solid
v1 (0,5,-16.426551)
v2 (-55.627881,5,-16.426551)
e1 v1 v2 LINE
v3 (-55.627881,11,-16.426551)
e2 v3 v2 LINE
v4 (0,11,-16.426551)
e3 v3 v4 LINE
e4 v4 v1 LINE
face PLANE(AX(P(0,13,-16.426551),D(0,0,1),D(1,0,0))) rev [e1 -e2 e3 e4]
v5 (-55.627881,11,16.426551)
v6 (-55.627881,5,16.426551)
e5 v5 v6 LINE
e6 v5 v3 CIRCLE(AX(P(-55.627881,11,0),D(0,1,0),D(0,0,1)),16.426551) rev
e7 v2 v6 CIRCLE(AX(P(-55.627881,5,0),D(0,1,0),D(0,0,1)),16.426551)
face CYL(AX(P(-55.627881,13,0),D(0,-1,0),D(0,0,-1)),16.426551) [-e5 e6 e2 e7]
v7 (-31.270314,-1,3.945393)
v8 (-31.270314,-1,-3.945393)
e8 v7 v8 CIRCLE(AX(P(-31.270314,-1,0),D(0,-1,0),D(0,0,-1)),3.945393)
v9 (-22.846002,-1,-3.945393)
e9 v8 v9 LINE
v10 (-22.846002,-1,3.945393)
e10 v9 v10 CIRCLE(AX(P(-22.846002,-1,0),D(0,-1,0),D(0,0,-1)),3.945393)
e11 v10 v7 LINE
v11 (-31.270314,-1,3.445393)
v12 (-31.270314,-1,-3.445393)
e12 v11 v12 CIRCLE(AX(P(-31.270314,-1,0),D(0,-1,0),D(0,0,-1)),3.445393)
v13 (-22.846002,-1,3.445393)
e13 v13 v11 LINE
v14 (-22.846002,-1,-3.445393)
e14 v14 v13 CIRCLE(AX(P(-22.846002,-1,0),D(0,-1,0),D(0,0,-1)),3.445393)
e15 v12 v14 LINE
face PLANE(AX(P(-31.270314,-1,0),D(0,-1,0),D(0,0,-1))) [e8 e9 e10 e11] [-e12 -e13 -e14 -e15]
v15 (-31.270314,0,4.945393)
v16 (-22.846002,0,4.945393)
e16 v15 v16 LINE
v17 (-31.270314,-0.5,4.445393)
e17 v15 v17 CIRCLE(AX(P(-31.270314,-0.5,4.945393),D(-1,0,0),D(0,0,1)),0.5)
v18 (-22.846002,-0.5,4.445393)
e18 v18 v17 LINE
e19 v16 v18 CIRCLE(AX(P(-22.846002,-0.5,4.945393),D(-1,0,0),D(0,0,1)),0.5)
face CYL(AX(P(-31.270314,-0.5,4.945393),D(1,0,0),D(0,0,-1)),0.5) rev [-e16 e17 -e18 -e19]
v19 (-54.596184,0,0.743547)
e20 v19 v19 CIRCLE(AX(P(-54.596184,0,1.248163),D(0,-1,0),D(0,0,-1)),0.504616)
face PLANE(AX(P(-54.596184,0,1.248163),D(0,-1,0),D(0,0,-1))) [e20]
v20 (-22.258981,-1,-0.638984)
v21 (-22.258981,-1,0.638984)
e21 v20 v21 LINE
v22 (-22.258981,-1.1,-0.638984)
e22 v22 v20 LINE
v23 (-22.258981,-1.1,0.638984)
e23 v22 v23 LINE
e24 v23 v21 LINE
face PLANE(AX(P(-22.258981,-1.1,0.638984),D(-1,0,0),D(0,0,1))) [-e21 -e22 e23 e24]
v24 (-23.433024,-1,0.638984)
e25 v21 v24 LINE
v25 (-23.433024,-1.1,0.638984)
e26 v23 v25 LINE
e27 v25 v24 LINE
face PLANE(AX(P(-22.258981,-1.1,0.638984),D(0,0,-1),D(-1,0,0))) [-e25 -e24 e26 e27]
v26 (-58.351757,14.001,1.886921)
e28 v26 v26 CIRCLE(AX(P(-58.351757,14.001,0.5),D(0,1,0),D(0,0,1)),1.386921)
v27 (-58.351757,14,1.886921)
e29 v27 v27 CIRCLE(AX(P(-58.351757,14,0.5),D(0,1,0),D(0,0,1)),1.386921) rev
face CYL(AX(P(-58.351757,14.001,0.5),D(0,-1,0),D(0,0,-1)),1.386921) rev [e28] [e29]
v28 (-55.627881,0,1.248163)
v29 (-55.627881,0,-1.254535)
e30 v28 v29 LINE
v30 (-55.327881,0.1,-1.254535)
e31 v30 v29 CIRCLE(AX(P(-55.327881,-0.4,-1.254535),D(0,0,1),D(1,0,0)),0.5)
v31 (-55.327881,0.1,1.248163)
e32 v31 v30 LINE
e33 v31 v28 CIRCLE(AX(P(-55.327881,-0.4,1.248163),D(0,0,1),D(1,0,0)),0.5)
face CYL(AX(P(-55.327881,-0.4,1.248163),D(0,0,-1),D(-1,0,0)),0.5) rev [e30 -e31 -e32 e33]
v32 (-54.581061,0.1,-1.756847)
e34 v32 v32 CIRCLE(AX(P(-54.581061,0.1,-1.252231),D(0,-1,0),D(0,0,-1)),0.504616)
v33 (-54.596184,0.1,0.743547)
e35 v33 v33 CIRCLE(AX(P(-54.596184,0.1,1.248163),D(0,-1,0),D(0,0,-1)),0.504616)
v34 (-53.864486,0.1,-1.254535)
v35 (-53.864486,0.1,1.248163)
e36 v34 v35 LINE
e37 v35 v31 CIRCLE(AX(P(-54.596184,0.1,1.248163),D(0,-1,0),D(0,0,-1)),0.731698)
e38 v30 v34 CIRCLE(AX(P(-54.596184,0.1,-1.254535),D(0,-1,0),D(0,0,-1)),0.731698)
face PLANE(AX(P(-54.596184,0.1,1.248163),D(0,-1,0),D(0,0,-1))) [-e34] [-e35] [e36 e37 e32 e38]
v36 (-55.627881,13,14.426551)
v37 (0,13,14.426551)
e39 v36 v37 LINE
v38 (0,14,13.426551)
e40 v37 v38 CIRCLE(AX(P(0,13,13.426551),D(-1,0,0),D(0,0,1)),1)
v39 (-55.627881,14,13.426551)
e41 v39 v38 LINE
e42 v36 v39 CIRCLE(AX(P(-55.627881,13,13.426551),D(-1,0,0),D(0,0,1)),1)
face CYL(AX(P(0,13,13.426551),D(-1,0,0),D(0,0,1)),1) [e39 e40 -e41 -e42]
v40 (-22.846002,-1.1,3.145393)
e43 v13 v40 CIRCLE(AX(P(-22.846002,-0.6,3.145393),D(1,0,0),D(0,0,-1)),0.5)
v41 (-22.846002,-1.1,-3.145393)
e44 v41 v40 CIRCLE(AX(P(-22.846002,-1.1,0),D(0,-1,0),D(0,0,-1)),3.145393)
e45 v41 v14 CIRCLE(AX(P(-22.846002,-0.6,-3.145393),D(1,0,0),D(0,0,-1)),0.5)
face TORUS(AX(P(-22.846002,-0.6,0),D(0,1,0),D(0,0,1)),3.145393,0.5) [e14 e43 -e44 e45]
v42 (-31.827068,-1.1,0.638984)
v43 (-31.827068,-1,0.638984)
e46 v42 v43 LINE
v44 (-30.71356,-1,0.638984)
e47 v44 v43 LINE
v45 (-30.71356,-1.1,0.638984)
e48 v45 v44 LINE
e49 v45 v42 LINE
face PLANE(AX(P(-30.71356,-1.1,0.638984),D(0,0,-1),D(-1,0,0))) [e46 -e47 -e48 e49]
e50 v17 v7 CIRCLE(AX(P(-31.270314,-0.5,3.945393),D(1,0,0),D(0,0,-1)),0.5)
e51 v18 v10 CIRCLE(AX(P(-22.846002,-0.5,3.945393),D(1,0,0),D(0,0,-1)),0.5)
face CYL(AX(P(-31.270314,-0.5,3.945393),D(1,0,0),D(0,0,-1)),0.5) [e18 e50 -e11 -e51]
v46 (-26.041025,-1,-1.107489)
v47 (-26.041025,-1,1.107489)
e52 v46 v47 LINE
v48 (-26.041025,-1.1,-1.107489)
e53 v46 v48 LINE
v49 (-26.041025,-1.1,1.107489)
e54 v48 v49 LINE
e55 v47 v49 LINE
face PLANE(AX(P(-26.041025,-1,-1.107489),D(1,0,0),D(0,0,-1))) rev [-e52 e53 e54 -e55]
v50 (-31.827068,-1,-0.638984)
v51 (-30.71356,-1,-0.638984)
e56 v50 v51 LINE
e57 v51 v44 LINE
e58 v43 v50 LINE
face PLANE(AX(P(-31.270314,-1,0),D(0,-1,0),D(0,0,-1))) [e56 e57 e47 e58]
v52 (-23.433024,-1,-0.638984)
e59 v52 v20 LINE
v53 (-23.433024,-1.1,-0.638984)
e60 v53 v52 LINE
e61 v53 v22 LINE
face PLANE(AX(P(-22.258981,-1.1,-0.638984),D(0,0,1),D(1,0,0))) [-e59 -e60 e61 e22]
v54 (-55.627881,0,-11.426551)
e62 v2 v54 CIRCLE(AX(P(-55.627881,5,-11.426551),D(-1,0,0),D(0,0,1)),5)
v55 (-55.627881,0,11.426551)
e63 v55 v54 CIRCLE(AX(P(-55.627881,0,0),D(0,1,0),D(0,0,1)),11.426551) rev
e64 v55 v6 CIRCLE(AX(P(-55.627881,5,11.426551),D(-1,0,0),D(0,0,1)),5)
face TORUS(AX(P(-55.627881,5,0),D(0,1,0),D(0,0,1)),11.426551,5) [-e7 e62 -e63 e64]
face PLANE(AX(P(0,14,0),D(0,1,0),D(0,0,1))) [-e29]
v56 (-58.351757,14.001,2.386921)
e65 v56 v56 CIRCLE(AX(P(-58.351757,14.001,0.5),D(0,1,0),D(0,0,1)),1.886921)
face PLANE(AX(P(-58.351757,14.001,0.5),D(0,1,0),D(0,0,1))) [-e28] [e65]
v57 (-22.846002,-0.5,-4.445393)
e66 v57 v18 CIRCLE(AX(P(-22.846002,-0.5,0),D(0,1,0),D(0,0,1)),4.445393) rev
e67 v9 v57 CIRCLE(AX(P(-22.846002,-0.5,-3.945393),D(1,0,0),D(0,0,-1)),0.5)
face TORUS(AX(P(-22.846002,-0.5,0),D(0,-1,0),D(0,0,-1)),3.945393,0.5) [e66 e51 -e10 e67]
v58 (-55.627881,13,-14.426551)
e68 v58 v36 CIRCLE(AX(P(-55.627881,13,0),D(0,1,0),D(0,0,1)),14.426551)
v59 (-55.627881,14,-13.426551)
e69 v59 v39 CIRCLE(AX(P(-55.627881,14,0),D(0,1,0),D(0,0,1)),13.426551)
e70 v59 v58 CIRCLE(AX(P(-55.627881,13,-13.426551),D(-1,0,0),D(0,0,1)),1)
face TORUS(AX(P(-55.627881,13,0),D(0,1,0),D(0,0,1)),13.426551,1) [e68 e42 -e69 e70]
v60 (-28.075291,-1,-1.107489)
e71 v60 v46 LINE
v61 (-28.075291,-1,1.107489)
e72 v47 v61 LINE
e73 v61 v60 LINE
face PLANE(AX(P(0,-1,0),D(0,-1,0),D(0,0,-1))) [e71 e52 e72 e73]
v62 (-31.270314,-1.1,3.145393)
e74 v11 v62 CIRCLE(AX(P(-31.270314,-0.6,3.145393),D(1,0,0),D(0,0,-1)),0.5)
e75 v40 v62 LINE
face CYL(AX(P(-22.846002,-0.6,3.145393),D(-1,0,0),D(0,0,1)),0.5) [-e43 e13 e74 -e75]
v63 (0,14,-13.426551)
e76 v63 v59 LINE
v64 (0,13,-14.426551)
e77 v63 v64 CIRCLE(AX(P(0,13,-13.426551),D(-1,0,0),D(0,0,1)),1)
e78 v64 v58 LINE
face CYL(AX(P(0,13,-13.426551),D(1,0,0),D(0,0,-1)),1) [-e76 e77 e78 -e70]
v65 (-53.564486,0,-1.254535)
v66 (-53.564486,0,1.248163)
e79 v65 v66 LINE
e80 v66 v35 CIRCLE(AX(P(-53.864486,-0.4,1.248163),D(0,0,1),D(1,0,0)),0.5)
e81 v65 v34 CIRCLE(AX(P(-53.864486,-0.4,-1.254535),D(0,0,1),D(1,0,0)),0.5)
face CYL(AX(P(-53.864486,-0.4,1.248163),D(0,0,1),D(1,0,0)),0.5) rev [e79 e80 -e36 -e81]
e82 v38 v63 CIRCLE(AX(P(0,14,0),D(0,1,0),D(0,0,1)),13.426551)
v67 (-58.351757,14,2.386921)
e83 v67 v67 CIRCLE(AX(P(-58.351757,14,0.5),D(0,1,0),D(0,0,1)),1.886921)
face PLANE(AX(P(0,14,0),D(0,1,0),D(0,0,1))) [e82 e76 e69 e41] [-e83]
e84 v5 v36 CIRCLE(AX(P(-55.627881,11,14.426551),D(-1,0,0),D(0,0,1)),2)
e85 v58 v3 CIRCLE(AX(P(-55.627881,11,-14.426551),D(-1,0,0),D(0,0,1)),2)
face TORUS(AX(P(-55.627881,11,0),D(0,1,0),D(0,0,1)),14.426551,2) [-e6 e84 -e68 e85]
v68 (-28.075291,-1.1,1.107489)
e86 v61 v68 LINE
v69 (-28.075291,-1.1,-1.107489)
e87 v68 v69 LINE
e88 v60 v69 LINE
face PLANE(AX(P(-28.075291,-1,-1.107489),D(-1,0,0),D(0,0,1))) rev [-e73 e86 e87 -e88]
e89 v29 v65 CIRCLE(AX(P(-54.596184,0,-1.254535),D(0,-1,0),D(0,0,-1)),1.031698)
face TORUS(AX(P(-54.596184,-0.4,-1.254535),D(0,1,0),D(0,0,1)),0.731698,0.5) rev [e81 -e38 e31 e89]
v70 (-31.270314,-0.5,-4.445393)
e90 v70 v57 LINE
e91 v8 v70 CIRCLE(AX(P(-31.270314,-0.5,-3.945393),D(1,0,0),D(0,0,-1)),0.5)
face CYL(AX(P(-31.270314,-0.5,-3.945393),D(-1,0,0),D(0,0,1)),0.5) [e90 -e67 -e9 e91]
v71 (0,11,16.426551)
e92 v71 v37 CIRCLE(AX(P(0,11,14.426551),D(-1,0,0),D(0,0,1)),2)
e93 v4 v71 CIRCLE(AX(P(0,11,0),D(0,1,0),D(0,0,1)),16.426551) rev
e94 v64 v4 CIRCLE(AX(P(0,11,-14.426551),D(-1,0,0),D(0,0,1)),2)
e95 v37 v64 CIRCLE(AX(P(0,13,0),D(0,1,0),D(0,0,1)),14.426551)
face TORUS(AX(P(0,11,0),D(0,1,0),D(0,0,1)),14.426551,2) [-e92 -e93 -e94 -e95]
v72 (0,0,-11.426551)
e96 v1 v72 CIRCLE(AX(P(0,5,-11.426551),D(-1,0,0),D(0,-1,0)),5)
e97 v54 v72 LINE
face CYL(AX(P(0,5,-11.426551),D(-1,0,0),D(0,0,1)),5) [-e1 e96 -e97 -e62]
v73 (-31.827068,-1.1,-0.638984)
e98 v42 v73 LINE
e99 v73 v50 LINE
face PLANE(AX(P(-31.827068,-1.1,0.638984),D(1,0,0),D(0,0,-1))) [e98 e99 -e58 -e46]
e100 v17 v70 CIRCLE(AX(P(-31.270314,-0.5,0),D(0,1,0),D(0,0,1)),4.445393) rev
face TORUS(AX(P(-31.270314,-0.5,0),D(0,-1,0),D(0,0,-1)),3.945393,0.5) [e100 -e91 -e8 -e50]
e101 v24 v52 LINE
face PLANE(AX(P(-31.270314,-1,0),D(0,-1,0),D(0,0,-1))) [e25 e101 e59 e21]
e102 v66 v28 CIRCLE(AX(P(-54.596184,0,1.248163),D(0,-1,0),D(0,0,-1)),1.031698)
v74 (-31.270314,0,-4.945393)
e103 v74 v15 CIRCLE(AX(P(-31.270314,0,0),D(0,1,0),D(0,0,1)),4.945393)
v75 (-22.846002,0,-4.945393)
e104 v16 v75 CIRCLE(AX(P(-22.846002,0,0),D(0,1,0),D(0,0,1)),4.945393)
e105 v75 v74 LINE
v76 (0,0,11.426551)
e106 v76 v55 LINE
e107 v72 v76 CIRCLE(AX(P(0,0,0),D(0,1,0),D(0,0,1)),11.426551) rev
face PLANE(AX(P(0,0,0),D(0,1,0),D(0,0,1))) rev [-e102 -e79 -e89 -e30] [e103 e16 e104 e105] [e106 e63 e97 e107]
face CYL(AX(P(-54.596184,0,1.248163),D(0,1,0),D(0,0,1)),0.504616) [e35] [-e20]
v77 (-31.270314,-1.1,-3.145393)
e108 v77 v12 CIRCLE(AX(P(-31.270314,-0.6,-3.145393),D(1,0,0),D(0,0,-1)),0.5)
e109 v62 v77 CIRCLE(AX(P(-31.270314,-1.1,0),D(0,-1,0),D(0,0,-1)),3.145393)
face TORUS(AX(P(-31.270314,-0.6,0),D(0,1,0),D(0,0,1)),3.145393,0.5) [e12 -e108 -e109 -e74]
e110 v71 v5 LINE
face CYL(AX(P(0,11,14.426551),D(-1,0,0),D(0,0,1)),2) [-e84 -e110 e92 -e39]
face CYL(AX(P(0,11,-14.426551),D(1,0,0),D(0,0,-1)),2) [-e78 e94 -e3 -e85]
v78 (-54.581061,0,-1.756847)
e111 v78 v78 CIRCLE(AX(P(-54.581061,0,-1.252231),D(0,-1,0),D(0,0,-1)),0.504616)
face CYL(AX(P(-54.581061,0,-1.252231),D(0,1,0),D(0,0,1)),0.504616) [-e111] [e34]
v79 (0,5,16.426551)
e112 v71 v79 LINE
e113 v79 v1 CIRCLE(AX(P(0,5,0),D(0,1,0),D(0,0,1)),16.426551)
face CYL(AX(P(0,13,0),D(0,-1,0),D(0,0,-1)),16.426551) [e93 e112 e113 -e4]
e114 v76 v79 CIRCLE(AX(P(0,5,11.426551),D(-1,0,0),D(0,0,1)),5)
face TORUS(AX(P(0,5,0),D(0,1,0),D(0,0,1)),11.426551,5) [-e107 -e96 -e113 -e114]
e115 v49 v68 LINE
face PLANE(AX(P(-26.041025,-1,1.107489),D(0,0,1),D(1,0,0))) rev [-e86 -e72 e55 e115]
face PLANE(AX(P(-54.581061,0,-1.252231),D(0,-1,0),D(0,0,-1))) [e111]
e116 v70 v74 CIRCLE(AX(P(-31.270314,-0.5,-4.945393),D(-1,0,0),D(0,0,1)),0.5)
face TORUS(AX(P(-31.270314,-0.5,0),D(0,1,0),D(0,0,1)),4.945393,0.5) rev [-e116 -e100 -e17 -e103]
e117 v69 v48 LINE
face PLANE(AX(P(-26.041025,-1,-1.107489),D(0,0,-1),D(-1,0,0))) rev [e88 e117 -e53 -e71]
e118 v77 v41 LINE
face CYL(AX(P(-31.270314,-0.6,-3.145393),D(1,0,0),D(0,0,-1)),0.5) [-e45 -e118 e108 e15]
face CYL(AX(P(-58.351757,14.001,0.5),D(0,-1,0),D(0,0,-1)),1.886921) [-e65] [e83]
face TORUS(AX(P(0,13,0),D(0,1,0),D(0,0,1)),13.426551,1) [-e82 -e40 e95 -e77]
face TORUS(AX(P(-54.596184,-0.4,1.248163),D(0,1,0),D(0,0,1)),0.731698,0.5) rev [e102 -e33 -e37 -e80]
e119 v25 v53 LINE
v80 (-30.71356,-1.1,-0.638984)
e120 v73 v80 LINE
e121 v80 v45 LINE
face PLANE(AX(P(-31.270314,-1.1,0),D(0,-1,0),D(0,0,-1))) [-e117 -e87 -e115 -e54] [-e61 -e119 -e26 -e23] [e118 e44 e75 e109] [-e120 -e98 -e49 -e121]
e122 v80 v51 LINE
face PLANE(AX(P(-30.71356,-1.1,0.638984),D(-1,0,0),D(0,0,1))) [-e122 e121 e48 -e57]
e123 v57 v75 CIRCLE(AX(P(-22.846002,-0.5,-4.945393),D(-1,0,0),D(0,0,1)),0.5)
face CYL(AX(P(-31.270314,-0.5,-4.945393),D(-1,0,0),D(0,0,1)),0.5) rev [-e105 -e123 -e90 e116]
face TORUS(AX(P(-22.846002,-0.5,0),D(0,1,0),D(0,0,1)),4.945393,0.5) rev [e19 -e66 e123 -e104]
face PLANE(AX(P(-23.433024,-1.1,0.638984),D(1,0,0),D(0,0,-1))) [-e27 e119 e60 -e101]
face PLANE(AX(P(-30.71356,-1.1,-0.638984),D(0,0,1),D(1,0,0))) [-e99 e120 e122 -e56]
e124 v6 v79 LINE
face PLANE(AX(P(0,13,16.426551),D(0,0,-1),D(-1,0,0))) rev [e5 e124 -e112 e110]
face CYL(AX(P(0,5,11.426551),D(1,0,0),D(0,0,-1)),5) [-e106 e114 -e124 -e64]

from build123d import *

# Parameters (mm, degrees)
BOSS_EXTRUDE1_DEPTH = 13
FILLET1_R           = 2
BOSS_EXTRUDE2_DEPTH = 1
FILLET2_R           = 1
FILLET3_R           = 5
BOSS_EXTRUDE3_DEPTH = 1
FILLET4_R           = 0.5
SKETCH4_W           = 1.174042857
SKETCH4_H           = 1.277967626
SKETCH4_W_2         = 1.113508224
BOSS_EXTRUDE4_DEPTH = 0.1
FILLET5_R           = 0.5
FILLET6_R           = 0.5
SKETCH5_W           = 2.340411645
SKETCH5_H           = 2.629602796
BOSS_EXTRUDE5_DEPTH = 0.2
SKETCH6_W           = 2.034265593
SKETCH6_H           = 2.21497745
CUT_EXTRUDE1_DEPTH  = 0.1
CUT_EXTRUDE2_DEPTH  = 0.1
FILLET7_R           = 0.5
SKETCH9_R           = 0.50461609
BOSS_EXTRUDE6_DEPTH = 0.1
SKETCH14_R          = 1.886920972
SKETCH14_R_2        = 1.386920972
BOSS_EXTRUDE7_DEPTH = 0.001


# Some blends are built 0.0001 mm under size
with BuildPart() as part:
    # Sketch1 → Boss-Extrude1 (new body)
    with BuildSketch(Plane(origin=(0, 0, 0), x_dir=(1, 0, 0), z_dir=(0, 1, 0))):
        with BuildLine():
            Line((0, -16.426551001), (-55.627881437, -16.426551001))
            ThreePointArc((-55.627881437, -16.426551001), (-72.054432439, 0), (-55.627881437, 16.426551001))
            Line((-55.627881437, 16.426551001), (0, 16.426551001))
            ThreePointArc((0, 16.426551001), (16.426551001, 0), (0, -16.426551001))
        make_face()
    extrude(amount=BOSS_EXTRUDE1_DEPTH)

    # Fillet1
    fillet1_edges = [part.edges().sort_by_distance(p)[0] for p in [
        (-72.054432439, 13, 0),
        (-27.813940719, 13, 16.426551001),
        (16.426551001, 13, 0),
        (-27.813940719, 13, -16.426551001),
    ]]
    fillet(fillet1_edges, radius=FILLET1_R)

    # Sketch2 → Boss-Extrude2 (add)
    with BuildSketch(Plane(origin=(0, 13, 0), x_dir=(1, 0, 0), z_dir=(0, 1, 0))):
        with BuildLine():
            Line((0, 14.426551001), (-55.627881437, 14.426551001))
            ThreePointArc((-55.627881437, 14.426551001), (-70.054432439, 0), (-55.627881437, -14.426551001))
            Line((-55.627881437, -14.426551001), (0, -14.426551001))
            ThreePointArc((0, -14.426551001), (14.426551001, 0), (0, 14.426551001))
        make_face()
    extrude(amount=BOSS_EXTRUDE2_DEPTH)

    # Fillet2
    fillet2_edges = [part.edges().sort_by_distance(p)[0] for p in [
        (-70.054432439, 14, 0),
        (-27.813940719, 14, -14.426551001),
        (14.426551001, 14, 0),
        (-27.813940719, 14, 14.426551001),
    ]]
    fillet(fillet2_edges, radius=FILLET2_R - 0.0001)  # a hair under: the kernel refuses the full size

    # Fillet3
    fillet3_edges = [part.edges().sort_by_distance(p)[0] for p in [
        (-27.813940719, 0, 16.426551001),
        (-72.054432439, 0, 0),
        (-27.813940719, 0, -16.426551001),
        (16.426551001, 0, 0),
    ]]
    fillet(fillet3_edges, radius=FILLET3_R)

    # Sketch3 → Boss-Extrude3 (add)
    with BuildSketch(Plane.XZ):
        with BuildLine():
            Line((-31.270313728, 4.445393379), (-22.846002165, 4.445393379))
            ThreePointArc((-22.846002165, 4.445393379), (-18.400608786, 0), (-22.846002165, -4.445393379))
            Line((-22.846002165, -4.445393379), (-31.270313728, -4.445393379))
            ThreePointArc((-31.270313728, -4.445393379), (-35.715707107, 0), (-31.270313728, 4.445393379))
        make_face()
    extrude(amount=BOSS_EXTRUDE3_DEPTH)

    # Fillet4
    fillet4_edges = [part.edges().sort_by_distance(p)[0] for p in [
        (-35.715707107, 0, 0),
        (-27.058157947, 0, -4.445393379),
        (-18.400608786, 0, 0),
        (-27.058157947, 0, 4.445393379),
    ]]
    fillet(fillet4_edges, radius=FILLET4_R)

    # Sketch4 → Boss-Extrude4 (add)
    with BuildSketch(Plane.XZ.offset(1)):
        with BuildLine():
            Line((-31.270313728, -3.445393379), (-22.846002165, -3.445393379))
            ThreePointArc((-22.846002165, -3.445393379), (-19.400608786, 0), (-22.846002165, 3.445393379))
            Line((-22.846002165, 3.445393379), (-31.270313728, 3.445393379))
            ThreePointArc((-31.270313728, 3.445393379), (-34.715707107, 0), (-31.270313728, -3.445393379))
        make_face()
        with Locations((-22.846002166, 0)):
            Rectangle(SKETCH4_W, SKETCH4_H, mode=Mode.SUBTRACT)
        with Locations((-31.270313728, 0)):
            Rectangle(SKETCH4_W_2, SKETCH4_H, mode=Mode.SUBTRACT)
    extrude(amount=BOSS_EXTRUDE4_DEPTH)

    # Fillet5
    # the kernel refuses this fillet: 0.5 mm, written as the material it takes off along each edge
    with BuildSketch(Plane(origin=(-22.846002165, -1.1, 0), x_dir=(0, 0, -1), z_dir=(-1, 0, 0))) as fillet5_piece_1:
        with BuildLine():
            CenterArc((3.145393379, -0.5), FILLET5_R, 53.130102354, 36.869897646)
            Line((3.145393379, 0), (3.145393379, 0.01))
            Line((3.145393379, 0.01), (3.445393379, 0.01))
            Line((3.445393379, 0.01), (3.455393379, 0))
            ThreePointArc((3.455393379, 0), (3.455393379, -0.05), (3.451393379, -0.092))
            Line((3.451393379, -0.092), (3.445393379, -0.1))
        make_face()
    revolve(axis=Axis((-22.846002165, -1.1, 0), (0, -1, 0)), revolution_arc=180, mode=Mode.SUBTRACT)
    with BuildSketch(Plane(origin=(-31.270313728, -1.1, -3.445393379), x_dir=(0, 1, 0), z_dir=(1, 0, 0)), Plane(origin=(-22.846002165, -1.1, 3.445393379), x_dir=(0, 1, 0), z_dir=(-1, 0, 0))) as fillet5_piece_2:
        with BuildLine():
            CenterArc((0.5, 0.3), FILLET5_R, 180, 36.869897646)
            Line((0, 0.3), (-0.01, 0.3))
            Line((-0.01, 0.3), (-0.01, 0))
            Line((-0.01, 0), (0, -0.01))
            ThreePointArc((0, -0.01), (0.05, -0.01), (0.092, -0.006))
            Line((0.092, -0.006), (0.1, 0))
        make_face()
    extrude(amount=8.424311563, mode=Mode.SUBTRACT)
    with BuildSketch(Plane(origin=(-31.270313728, -1.1, 0), x_dir=(0, 0, 1), z_dir=(1, 0, 0))) as fillet5_piece_3:
        with BuildLine():
            CenterArc((3.145393379, -0.5), FILLET5_R, 53.130102354, 36.869897646)
            Line((3.145393379, 0), (3.145393379, 0.01))
            Line((3.145393379, 0.01), (3.445393379, 0.01))
            Line((3.445393379, 0.01), (3.455393379, 0))
            ThreePointArc((3.455393379, 0), (3.455393379, -0.05), (3.451393379, -0.092))
            Line((3.451393379, -0.092), (3.445393379, -0.1))
        make_face()
    revolve(axis=Axis((-31.270313728, -1.1, 0), (0, -1, 0)), revolution_arc=180, mode=Mode.SUBTRACT)

    # Fillet6
    fillet6_edges = [part.edges().sort_by_distance(p)[0] for p in [
        (-18.400608786, -1, 0),
        (-27.058157947, -1, -4.445393379),
        (-35.715707107, -1, 0),
        (-27.058157947, -1, 4.445393379),
    ]]
    fillet(fillet6_edges, radius=FILLET6_R - 0.0001)  # a hair under: the kernel refuses the full size

    # Sketch5 → Boss-Extrude5 (add)
    with BuildSketch(Plane.XZ.offset(1.1)):
        with Locations((-27.058157947, 0)):
            Rectangle(SKETCH5_W, SKETCH5_H)
    extrude(amount=-BOSS_EXTRUDE5_DEPTH)

    # Sketch6 → Cut-Extrude1 (cut)
    with BuildSketch(Plane.XZ.offset(1.1)):
        with Locations((-27.058157947, 0)):
            Rectangle(SKETCH6_W, SKETCH6_H)
    extrude(amount=-CUT_EXTRUDE1_DEPTH, mode=Mode.SUBTRACT)

    # Sketch7 → Cut-Extrude2 (cut)
    with BuildSketch(Plane.XZ):
        with BuildLine():
            Line((-53.564486161, 1.248163032), (-53.564486161, -1.254534769))
            ThreePointArc((-53.564486161, -1.254534769), (-54.596183799, -2.286232407), (-55.627881437, -1.254534769))
            Line((-55.627881437, -1.254534769), (-55.627881437, 1.248163032))
            ThreePointArc((-55.627881437, 1.248163032), (-54.596183799, 2.27986067), (-53.564486161, 1.248163032))
        make_face()
    extrude(amount=-CUT_EXTRUDE2_DEPTH, mode=Mode.SUBTRACT)

    # Fillet7
    # the kernel refuses this fillet: 0.5 mm, written as the material it adds along each edge
    with BuildSketch(Plane(origin=(-55.627881437, 0.1, -1.254534769), x_dir=(0, -1, 0), z_dir=(0, 0, 1)), Plane(origin=(-53.564486161, 0.1, 1.248163032), x_dir=(0, -1, 0), z_dir=(0, 0, -1))) as fillet7_piece_1:
        with BuildLine():
            CenterArc((0.5, 0.3), FILLET7_R, 180, 36.869897646)
            Line((0, 0.3), (-0.01, 0.3))
            Line((-0.01, 0.3), (-0.01, 0))
            Line((-0.01, 0), (0, -0.01))
            ThreePointArc((0, -0.01), (0.05, -0.01), (0.092, -0.006))
            Line((0.092, -0.006), (0.1, 0))
        make_face()
    extrude(amount=2.502697801)
    with BuildSketch(Plane(origin=(-54.596183799, 0.1, -1.254534769), x_dir=(1, 0, 0), z_dir=(0, 0, 1))) as fillet7_piece_2:
        with BuildLine():
            CenterArc((0.731697638, -0.5), FILLET7_R, 53.130102354, 36.869897646)
            Line((0.731697638, 0), (0.731697638, 0.01))
            Line((0.731697638, 0.01), (1.031697638, 0.01))
            Line((1.031697638, 0.01), (1.041697638, 0))
            ThreePointArc((1.041697638, 0), (1.041697638, -0.05), (1.037697638, -0.092))
            Line((1.037697638, -0.092), (1.031697638, -0.1))
        make_face()
    revolve(axis=Axis((-54.596183799, 0.1, -1.254534769), (0, 1, 0)), revolution_arc=180)
    with BuildSketch(Plane(origin=(-54.596183799, 0.1, 1.248163032), x_dir=(-1, 0, 0), z_dir=(0, 0, -1))) as fillet7_piece_3:
        with BuildLine():
            CenterArc((0.731697638, -0.5), FILLET7_R, 53.130102354, 36.869897646)
            Line((0.731697638, 0), (0.731697638, 0.01))
            Line((0.731697638, 0.01), (1.031697638, 0.01))
            Line((1.031697638, 0.01), (1.041697638, 0))
            ThreePointArc((1.041697638, 0), (1.041697638, -0.05), (1.037697638, -0.092))
            Line((1.037697638, -0.092), (1.031697638, -0.1))
        make_face()
    revolve(axis=Axis((-54.596183799, 0.1, 1.248163032), (0, 1, 0)), revolution_arc=180)

    # Sketch9 → Boss-Extrude6 (add)
    with BuildSketch(Plane.XZ.offset(-0.1)):
        with Locations(Location((-54.596183799, 1.248163032, 0), (0, 0, 270))):
            Circle(SKETCH9_R)
        with Locations(Location((-54.581060794, -1.252231394, 0), (0, 0, 270))):
            Circle(SKETCH9_R)
    extrude(amount=BOSS_EXTRUDE6_DEPTH)

    # Sketch14 → Boss-Extrude7 (add)
    with BuildSketch(Plane(origin=(0, 14, 0), x_dir=(1, 0, 0), z_dir=(0, 1, 0))):
        with Locations(Location((-58.35175738, -0.5, 0), (0, 0, 270))):
            Circle(SKETCH14_R)
        with Locations(Location((-58.35175738, -0.5, 0), (0, 0, 270))):
            Circle(SKETCH14_R_2, mode=Mode.SUBTRACT)
    extrude(amount=BOSS_EXTRUDE7_DEPTH)


solid = part.part
